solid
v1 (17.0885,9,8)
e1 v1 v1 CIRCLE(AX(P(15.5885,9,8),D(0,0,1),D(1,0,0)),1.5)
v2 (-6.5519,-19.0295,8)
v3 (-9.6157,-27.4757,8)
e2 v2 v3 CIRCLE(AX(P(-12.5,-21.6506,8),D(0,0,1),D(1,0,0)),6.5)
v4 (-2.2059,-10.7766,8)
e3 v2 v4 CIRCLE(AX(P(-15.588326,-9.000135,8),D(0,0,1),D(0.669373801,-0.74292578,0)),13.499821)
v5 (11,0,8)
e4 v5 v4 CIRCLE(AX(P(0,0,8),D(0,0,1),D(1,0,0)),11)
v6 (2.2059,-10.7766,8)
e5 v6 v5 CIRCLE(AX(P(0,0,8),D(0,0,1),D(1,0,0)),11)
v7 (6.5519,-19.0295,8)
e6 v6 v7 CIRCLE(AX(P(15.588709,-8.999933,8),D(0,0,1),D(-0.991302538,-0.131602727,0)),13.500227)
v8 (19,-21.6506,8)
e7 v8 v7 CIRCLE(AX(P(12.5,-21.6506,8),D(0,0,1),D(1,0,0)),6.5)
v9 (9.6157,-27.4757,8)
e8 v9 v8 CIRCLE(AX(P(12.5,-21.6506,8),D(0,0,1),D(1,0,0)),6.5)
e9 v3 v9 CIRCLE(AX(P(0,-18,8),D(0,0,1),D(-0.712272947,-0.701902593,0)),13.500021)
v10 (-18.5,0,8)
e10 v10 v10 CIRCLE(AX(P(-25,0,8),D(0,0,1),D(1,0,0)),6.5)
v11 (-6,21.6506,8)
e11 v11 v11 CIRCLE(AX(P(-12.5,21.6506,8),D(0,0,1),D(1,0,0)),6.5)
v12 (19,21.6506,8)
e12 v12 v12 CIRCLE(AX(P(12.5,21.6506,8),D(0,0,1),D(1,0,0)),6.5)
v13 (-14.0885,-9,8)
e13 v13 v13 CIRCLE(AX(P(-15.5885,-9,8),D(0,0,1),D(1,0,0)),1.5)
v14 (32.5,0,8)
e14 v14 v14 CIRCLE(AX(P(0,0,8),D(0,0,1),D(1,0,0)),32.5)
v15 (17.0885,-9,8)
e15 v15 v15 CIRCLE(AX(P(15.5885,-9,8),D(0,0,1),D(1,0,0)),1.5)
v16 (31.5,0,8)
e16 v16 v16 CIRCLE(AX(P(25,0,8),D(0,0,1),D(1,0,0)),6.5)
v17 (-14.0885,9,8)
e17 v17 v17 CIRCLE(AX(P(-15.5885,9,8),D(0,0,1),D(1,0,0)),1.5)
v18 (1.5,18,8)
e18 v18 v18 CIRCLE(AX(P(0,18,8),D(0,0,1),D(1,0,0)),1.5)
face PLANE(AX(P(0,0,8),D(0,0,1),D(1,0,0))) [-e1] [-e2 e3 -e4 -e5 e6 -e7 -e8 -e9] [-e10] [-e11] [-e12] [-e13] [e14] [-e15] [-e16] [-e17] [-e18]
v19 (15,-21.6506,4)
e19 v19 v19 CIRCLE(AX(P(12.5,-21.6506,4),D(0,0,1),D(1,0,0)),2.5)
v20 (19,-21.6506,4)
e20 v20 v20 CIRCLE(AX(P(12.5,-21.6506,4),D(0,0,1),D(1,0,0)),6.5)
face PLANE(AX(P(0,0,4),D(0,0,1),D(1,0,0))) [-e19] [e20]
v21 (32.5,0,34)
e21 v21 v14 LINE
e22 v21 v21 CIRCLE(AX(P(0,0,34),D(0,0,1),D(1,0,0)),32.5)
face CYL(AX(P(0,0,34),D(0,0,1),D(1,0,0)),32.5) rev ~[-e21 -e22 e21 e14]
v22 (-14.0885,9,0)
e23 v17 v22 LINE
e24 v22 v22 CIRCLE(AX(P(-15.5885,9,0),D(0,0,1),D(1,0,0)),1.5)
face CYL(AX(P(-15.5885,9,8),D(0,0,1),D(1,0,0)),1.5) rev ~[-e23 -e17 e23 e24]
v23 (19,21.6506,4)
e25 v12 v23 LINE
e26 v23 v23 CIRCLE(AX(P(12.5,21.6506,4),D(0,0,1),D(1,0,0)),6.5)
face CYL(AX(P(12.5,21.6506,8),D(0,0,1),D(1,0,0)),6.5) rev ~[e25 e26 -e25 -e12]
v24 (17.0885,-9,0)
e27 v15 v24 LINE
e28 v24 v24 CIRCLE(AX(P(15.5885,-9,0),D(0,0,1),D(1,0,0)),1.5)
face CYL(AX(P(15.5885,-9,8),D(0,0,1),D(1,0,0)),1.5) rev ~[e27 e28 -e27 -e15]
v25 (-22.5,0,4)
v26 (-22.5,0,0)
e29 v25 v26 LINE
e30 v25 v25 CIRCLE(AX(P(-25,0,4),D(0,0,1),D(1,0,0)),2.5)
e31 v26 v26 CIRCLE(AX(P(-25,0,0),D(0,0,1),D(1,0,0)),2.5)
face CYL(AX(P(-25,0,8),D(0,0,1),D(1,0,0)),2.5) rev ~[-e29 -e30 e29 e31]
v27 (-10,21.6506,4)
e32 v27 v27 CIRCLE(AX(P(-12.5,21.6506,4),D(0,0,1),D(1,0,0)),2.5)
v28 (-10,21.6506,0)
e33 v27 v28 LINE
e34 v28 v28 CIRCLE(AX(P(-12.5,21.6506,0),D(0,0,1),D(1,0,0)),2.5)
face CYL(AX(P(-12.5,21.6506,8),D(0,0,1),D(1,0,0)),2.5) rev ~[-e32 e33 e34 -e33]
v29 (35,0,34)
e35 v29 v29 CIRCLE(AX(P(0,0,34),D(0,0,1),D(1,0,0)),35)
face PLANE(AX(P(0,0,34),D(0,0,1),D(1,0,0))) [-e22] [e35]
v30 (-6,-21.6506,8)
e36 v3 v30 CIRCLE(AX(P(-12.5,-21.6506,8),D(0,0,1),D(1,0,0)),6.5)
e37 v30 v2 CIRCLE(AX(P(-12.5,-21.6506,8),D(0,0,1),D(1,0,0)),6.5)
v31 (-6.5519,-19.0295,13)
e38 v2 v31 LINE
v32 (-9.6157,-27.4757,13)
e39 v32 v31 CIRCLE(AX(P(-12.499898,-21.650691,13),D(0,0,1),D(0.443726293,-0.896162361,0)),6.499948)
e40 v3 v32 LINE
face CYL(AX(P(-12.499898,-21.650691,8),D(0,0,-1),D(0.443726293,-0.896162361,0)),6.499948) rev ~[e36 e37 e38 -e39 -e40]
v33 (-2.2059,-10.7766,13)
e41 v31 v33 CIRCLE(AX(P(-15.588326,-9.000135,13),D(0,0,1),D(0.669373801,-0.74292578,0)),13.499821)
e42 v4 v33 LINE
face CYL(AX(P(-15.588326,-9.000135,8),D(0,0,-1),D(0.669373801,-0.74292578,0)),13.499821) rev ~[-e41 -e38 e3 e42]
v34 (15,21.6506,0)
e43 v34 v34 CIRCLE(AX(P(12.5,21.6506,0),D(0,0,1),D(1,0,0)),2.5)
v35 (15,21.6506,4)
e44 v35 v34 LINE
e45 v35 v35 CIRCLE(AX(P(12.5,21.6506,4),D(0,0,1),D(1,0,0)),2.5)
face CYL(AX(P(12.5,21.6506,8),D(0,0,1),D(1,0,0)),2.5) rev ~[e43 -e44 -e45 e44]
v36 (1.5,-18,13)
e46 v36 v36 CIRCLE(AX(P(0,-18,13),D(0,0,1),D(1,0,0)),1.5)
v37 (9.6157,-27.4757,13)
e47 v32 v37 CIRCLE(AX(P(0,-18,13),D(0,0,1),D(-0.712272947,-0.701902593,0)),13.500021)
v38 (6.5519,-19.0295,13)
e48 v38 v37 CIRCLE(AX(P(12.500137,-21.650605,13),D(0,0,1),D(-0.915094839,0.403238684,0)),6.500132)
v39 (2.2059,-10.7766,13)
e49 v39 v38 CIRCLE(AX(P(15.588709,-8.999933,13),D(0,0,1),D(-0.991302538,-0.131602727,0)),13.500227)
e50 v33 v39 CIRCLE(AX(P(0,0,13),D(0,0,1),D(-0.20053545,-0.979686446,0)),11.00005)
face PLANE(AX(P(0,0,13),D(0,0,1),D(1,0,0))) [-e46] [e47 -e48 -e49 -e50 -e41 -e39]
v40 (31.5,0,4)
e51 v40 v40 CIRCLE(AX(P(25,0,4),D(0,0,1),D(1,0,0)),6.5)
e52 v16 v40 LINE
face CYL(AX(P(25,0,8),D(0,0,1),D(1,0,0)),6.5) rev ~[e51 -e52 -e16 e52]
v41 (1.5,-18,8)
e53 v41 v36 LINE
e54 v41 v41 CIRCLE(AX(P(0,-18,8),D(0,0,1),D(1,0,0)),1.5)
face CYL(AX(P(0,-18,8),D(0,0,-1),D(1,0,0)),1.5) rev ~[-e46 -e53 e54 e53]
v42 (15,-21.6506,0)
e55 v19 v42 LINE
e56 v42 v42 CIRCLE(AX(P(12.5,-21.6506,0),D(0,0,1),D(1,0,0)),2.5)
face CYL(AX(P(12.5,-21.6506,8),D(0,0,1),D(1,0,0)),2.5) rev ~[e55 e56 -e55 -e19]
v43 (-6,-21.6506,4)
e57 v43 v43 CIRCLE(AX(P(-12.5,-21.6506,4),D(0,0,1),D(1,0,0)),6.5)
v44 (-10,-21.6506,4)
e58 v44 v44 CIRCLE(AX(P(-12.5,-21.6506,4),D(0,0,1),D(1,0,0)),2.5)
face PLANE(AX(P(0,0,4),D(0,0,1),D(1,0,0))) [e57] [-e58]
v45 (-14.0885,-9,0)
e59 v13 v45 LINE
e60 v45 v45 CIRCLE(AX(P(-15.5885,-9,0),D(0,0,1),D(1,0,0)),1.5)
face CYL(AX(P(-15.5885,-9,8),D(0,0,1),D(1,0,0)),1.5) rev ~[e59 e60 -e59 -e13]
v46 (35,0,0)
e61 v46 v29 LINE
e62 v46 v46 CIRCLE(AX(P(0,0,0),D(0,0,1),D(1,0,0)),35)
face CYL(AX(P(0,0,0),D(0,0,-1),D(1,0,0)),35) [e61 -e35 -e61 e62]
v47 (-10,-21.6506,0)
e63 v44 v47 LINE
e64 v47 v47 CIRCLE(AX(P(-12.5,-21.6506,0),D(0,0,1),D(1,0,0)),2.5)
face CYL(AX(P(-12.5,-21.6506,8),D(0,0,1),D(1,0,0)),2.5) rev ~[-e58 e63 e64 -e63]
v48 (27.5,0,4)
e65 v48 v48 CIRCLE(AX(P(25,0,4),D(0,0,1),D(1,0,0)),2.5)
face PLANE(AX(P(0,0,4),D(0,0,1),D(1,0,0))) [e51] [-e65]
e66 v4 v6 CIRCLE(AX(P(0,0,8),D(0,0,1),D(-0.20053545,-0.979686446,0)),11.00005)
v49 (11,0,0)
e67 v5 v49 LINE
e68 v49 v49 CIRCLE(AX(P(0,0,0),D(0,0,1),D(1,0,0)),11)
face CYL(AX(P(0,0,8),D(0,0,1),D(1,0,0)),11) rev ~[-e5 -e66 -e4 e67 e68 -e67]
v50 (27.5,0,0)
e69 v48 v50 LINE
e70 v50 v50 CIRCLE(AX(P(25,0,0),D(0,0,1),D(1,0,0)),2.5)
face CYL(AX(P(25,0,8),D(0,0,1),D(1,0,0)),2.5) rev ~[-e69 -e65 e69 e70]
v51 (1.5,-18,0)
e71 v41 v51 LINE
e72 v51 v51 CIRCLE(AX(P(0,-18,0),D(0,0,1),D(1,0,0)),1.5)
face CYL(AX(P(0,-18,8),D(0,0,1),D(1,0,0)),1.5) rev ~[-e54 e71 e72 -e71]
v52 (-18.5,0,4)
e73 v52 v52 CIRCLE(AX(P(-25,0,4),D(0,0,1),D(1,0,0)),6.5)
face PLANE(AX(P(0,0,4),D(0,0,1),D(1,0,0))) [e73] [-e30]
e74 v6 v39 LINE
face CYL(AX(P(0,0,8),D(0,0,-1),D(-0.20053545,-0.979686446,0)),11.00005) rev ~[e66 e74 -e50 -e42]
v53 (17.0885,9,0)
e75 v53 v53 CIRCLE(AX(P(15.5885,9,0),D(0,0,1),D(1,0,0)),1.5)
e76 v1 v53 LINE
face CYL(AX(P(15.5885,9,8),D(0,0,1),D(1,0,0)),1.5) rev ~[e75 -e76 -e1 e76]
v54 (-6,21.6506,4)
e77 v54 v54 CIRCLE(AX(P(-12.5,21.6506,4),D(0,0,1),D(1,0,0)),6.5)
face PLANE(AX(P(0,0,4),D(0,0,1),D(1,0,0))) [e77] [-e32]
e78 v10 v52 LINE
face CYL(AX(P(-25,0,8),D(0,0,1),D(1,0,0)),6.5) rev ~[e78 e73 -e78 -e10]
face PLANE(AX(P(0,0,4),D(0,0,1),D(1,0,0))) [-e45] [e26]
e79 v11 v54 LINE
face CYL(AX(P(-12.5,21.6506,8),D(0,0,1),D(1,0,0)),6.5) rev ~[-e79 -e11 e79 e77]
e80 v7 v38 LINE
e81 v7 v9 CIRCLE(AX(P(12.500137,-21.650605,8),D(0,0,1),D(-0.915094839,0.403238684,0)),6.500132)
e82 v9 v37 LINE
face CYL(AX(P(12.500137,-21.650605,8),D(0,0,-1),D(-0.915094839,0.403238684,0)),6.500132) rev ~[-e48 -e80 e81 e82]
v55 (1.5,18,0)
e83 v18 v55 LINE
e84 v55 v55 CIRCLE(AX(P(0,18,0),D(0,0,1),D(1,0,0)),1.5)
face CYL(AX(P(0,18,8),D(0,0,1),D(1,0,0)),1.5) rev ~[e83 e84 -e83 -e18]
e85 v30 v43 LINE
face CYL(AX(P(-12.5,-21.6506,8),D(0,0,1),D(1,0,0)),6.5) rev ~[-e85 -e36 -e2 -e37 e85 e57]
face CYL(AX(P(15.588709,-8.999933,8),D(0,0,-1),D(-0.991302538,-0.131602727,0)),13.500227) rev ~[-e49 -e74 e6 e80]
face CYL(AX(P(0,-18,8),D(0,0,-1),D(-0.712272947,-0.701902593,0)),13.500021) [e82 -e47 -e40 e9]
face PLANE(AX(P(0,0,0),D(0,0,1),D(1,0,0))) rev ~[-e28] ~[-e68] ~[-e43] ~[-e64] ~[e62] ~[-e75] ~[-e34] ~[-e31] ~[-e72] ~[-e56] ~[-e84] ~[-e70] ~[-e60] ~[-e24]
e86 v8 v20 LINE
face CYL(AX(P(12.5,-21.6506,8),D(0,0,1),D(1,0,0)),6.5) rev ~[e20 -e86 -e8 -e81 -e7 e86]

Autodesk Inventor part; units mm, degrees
ref_plane "YZ Plane" through (0, 0, 0) normal (1, 0, 0) x (0, 1, 0)
ref_plane "XZ Plane" through (0, 0, 0) normal (0, 1, 0) x (-1, 0, 0)
ref_plane "XY Plane" through (0, 0, 0) normal (0, 0, 1) x (1, 0, 0)
sketch "Sketch1" plane through (0, 0, 0) normal (0, 0, 1) x (1, 0, 0)
  circle A0 centre (0, 0) radius 35
  dimension "d0" = 70
extrude "Extrusion1" add sketch "Sketch1" along normal blind 34
sketch "Sketch2" plane through (0, 0, 34) normal (0, 0, 1) x (1, 0, 0)
  circle A0 centre (0, 0) radius 35 projected
  circle A1 centre (0, 0) radius 32.5
  dimension "d105" = 65
extrude "Extrusion2" cut sketch "Sketch2" against normal blind 26 contours A1
sketch "Sketch3" plane through (0, 0, 8) normal (0, 0, 1) x (1, 0, 0)
  circle A0 centre (0, 0) radius 11
  dimension "d6" = 22
extrude "Extrusion3" cut sketch "Sketch3" against normal through all
sketch "Sketch4" plane through (0, 0, 8) normal (0, 0, 1) x (1, 0, 0)
  circle A0 centre (25, 0) radius 6.5
  circle A1 centre (12.5, 21.6506) radius 6.5
  circle A2 centre (-12.5, 21.6506) radius 6.5
  circle A3 centre (-25, 0) radius 6.5
  circle A4 centre (-12.5, -21.6506) radius 6.5
  circle A5 centre (12.5, -21.6506) radius 6.5
  point P0 (0, 0)
  dimension "d9" = 13
  dimension "d10" = 25
  dimension "d13" = 360
extrude "Extrusion4" cut sketch "Sketch4" against normal blind 4
sketch "Sketch5" plane through (0, 0, 8) normal (0, 0, 1) x (1, 0, 0)
  circle A0 centre (0, 0) radius 11 construction
  circle A1 centre (25, 0) radius 2.5
  circle A2 centre (12.5, 21.6506) radius 2.5
  circle A3 centre (-12.5, 21.6506) radius 2.5
  circle A4 centre (-25, 0) radius 2.5
  circle A5 centre (-12.5, -21.6506) radius 2.5
  circle A6 centre (12.5, -21.6506) radius 2.5
  dimension "d99" = 5
  dimension "d100" = 25
  dimension "d103" = 360
extrude "Extrusion5" cut sketch "Sketch5" against normal through all
sketch "Sketch6" plane through (0, 0, 8) normal (0, 0, 1) x (1, 0, 0)
  circle A0 centre (0, 18) radius 1.5
  circle A1 centre (-15.5885, 9) radius 1.5
  circle A2 centre (-15.5885, -9) radius 1.5
  circle A3 centre (0, -18) radius 1.5
  circle A4 centre (15.5885, -9) radius 1.5
  circle A5 centre (15.5885, 9) radius 1.5
  point P0 (0, 0)
  dimension "d24" = 3
  dimension "d25" = 18
  dimension "d28" = 360
extrude "Extrusion6" cut sketch "Sketch6" against normal through all
sketch "Sketch27" plane through (0, 0, 8) normal (0, 0, 1) x (1, 0, 0)
  circle A0 centre (-15.5885, -9) radius 1.5 construction
  circle A1 centre (-15.5885, -9) radius 13.5 construction
  circle A2 centre (15.5885, -9) radius 1.5 construction
  circle A3 centre (15.5885, -9) radius 13.5 construction
  circle A4 centre (0, -18) radius 1.5 projected
  circle A5 centre (-12.5, -21.6506) radius 6.5 construction
  circle A6 centre (0, 0) radius 11 construction
  arc A7 (-6.5519, -19.0295) -> (-2.2059, -10.7766) centre (-15.5885, -9) ccw
  arc A8 (2.2059, -10.7766) -> (6.5519, -19.0295) centre (15.5885, -9) ccw
  circle A9 centre (12.5, -21.6506) radius 6.5 construction
  circle A10 centre (0, -18) radius 13.5 construction
  arc A11 (6.5519, -19.0295) -> (9.6157, -27.4757) centre (12.5, -21.6506) ccw
  arc A12 (-9.6157, -27.4757) -> (-6.5519, -19.0295) centre (-12.5, -21.6506) ccw
  arc A13 (-9.6157, -27.4757) -> (9.6157, -27.4757) centre (0, -18) ccw
  arc A14 (-2.2059, -10.7766) -> (2.2059, -10.7766) centre (0, 0) ccw
  dimension "d106" = 27
  dimension "d107" = 27
  dimension "d108" = 27
extrude "Extrusion24" add sketch "Sketch27" along normal blind 5
properties part number "Base" material "ABS Plastic"
